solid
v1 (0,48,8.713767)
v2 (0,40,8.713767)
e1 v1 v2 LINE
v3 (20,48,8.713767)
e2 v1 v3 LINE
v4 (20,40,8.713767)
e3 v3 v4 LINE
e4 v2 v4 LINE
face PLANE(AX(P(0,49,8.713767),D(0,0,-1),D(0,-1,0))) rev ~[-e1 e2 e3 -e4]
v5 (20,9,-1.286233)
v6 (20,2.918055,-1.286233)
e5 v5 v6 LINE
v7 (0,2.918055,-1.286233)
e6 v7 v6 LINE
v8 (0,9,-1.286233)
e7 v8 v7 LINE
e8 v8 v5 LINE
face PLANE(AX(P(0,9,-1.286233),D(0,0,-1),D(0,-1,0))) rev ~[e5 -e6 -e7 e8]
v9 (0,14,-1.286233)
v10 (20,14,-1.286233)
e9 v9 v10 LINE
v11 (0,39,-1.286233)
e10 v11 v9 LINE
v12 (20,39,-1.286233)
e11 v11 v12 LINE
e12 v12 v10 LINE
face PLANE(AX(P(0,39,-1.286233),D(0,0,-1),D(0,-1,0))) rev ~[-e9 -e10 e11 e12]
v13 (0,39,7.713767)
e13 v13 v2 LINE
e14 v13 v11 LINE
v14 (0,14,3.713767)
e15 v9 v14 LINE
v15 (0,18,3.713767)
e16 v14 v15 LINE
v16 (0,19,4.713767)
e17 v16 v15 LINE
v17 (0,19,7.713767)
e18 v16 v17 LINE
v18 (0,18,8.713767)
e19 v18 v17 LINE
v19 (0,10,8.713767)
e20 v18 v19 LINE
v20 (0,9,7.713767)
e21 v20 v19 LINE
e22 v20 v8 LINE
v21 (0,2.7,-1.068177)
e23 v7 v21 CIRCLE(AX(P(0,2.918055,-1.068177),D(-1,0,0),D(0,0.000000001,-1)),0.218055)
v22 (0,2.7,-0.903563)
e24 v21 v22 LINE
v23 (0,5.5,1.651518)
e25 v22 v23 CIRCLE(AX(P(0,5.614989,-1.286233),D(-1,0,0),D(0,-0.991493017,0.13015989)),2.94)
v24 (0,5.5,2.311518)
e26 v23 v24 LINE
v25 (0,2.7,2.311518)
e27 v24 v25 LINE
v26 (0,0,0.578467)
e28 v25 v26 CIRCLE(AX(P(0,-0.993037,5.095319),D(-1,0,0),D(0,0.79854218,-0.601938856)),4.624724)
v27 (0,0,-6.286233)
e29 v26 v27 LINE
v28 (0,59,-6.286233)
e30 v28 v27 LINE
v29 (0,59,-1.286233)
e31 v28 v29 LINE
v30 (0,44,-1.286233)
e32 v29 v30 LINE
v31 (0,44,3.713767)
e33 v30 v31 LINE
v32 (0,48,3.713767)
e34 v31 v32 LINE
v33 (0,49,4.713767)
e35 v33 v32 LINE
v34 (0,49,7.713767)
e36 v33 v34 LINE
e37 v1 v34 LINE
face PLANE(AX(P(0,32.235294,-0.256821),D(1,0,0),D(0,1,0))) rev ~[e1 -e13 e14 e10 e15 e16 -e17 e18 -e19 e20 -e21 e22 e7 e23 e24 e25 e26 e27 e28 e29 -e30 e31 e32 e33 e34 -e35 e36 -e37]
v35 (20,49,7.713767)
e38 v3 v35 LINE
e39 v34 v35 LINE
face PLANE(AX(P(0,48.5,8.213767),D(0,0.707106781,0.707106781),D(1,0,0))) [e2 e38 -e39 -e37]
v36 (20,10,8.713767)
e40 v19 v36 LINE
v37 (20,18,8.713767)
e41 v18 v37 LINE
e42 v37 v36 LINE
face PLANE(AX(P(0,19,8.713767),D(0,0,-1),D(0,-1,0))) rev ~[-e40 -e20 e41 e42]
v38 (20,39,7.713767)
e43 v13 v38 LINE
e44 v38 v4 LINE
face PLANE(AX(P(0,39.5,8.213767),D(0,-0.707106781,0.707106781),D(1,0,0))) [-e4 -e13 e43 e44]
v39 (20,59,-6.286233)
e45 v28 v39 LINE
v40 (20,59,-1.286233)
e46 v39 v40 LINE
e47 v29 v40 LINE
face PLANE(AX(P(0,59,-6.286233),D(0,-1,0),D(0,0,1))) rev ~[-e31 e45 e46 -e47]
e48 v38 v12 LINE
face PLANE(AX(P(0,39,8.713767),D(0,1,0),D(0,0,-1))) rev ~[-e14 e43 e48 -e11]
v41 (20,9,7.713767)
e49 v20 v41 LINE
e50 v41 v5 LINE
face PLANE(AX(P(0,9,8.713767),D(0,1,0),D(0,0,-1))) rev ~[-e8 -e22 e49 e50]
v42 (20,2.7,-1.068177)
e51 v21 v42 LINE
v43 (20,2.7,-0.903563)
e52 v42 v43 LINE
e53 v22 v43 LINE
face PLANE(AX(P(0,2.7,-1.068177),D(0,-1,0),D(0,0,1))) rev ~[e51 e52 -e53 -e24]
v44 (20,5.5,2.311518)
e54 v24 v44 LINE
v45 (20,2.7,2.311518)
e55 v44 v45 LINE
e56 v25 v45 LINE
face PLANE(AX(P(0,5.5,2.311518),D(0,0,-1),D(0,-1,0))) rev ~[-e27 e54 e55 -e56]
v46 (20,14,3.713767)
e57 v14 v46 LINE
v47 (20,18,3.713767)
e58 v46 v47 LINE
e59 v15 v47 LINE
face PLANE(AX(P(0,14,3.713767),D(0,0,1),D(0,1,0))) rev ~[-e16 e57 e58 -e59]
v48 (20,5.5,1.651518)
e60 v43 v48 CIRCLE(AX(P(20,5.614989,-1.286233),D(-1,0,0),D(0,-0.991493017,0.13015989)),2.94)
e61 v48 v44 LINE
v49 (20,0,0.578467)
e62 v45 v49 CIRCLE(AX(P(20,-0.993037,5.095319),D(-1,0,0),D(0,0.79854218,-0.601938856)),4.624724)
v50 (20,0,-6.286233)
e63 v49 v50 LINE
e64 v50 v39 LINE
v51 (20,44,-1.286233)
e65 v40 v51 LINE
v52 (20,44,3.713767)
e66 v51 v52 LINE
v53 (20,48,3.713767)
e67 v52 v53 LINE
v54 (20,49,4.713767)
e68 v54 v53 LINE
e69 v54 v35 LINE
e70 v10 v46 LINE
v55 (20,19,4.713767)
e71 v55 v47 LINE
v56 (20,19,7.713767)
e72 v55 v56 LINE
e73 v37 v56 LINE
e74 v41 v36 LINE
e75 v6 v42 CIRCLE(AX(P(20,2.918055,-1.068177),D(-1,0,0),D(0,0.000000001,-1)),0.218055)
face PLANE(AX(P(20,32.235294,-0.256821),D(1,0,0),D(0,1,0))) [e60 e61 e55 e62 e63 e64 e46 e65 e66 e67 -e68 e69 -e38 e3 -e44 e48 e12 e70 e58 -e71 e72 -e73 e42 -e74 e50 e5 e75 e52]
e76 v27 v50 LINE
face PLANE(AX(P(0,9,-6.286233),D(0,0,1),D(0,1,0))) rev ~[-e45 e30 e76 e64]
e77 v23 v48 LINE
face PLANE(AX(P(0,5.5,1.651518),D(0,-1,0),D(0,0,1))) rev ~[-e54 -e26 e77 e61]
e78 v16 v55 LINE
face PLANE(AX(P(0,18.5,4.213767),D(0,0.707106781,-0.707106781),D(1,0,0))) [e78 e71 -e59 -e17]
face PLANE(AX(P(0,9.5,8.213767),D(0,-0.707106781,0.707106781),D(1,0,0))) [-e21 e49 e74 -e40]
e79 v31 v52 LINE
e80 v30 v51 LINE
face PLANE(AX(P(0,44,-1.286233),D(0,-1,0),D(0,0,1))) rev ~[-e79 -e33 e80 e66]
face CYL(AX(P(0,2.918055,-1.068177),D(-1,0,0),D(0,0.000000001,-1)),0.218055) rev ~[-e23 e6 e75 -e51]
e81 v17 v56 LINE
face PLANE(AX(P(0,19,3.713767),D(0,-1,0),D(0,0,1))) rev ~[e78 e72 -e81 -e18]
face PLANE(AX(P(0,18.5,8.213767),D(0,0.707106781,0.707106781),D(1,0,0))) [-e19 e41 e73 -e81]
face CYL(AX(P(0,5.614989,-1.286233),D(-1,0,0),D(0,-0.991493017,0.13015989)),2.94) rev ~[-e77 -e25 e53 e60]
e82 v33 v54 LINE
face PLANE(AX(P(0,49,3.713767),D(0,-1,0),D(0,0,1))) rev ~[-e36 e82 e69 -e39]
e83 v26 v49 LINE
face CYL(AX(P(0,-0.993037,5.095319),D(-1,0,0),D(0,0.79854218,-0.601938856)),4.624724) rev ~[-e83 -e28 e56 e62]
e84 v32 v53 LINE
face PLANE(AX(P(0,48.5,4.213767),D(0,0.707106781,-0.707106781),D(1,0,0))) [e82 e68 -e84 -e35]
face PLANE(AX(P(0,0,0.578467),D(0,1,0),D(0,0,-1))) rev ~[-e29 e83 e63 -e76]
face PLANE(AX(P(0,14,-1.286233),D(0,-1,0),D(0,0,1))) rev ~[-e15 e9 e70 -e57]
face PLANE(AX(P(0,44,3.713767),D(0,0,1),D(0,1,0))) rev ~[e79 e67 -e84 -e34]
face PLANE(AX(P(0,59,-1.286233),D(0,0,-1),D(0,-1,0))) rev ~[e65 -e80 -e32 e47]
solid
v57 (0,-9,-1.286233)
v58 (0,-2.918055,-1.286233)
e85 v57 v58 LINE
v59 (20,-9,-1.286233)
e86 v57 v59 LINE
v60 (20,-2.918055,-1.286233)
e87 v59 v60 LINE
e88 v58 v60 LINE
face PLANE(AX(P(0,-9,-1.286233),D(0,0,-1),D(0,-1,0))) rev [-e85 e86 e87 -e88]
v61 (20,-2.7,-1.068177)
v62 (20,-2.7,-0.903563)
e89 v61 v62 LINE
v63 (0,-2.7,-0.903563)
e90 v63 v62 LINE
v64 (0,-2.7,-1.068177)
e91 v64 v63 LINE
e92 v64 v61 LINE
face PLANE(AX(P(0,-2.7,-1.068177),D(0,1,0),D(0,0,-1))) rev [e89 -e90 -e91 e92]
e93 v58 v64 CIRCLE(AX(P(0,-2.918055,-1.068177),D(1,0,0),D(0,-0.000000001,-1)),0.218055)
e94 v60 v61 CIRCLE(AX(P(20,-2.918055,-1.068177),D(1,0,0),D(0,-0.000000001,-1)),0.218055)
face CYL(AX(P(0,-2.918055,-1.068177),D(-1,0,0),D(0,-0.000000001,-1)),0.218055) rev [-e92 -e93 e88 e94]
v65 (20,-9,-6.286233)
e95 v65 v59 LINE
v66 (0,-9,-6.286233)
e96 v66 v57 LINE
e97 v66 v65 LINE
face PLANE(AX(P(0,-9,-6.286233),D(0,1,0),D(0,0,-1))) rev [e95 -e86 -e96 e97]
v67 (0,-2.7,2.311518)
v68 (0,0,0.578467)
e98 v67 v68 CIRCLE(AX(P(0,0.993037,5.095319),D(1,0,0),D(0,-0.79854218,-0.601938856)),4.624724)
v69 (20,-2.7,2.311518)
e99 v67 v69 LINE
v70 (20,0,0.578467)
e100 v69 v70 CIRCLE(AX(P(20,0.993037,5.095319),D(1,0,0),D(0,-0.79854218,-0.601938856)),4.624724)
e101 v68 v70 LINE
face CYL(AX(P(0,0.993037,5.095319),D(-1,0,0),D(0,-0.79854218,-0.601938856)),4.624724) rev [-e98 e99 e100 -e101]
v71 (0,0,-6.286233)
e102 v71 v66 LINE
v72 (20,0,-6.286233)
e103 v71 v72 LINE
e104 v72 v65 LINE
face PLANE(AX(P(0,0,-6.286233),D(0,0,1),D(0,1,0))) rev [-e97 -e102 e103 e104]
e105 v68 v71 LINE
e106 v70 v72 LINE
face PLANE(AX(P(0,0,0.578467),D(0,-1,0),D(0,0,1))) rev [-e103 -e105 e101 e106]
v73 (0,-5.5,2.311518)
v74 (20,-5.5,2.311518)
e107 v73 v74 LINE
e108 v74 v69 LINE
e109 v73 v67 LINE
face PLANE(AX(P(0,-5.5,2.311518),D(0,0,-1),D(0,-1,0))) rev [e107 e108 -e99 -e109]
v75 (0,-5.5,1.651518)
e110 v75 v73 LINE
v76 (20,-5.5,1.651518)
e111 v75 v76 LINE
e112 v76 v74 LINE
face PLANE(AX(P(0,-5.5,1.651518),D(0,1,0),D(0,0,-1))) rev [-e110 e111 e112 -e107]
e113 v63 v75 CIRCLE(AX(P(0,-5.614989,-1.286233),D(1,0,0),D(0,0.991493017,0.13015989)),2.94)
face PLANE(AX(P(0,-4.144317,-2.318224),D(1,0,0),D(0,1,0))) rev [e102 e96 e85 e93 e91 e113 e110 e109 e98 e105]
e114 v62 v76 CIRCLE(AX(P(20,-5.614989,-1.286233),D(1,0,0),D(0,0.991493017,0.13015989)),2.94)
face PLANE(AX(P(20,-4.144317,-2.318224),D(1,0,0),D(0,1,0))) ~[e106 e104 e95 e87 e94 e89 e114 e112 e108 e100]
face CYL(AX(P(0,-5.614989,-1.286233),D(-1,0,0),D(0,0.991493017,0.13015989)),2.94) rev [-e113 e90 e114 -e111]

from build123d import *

# Parameters (mm, degrees)
F1_DEPTH = 20
F3_DEPTH = 20
F4_SIZE  = 1


# Not quite as in the source:
# - a pattern or mirror of a feature is missing from the dataset's text; its kind, count and spacing are read off the source's solid


with BuildPart() as f1:
    # F0 (on Right) → F1 (new body)
    with BuildSketch(Plane.YZ):
        with BuildLine():
            Line((5.5, 2.3115177173), (2.7, 2.3115177173))
            ThreePointArc((2.7, 2.3115177173), (1.5050999961, 1.2033549585), (0, 0.5784671916))
            Line((0, 0.5784671916), (0, -6.2862326842))
            Line((0, -6.2862326842), (9, -6.2862326842))
            Line((9, -6.2862326842), (9, -1.2862326842))
            Line((9, -1.2862326842), (2.9180552616, -1.2862326842))
            ThreePointArc((2.9180552616, -1.2862326842), (2.7638669074, -1.2223657768), (2.7, -1.0681774227))
            Line((2.7, -1.0681774227), (2.7, -0.9035626068))
            ThreePointArc((2.7, -0.9035626068), (3.6332473174, 0.8854712641), (5.5, 1.6515177173))
            Line((5.5, 1.6515177173), (5.5, 2.3115177173))
        make_face()
    extrude(amount=F1_DEPTH)


with BuildPart() as f1_copies_1:
    # F1_copies: instance of F1
    add(f1.part.mirror(Plane(origin=(0, 0, 0), x_dir=(0, 0, -1), z_dir=(0, -1, 0))))


with BuildPart() as f1_1:
    add(f1.part)

    # F2 (on Right) → F3 (join)
    with BuildSketch(Plane.YZ):
        Polygon((9, 8.7137673158), (9, -6.2862326842), (59, -6.2862326842), (59, -1.2862326842), (44, -1.2862326842), (44, 3.7137673158), (49, 3.7137673158), (49, 8.7137673158), (39, 8.7137673158), (39, -1.2862326842), (14, -1.2862326842), (14, 3.7137673158), (19, 3.7137673158), (19, 8.7137673158), align=None)
    extrude(amount=F3_DEPTH)

    # F4
    f4_edges = [f1_1.edges().sort_by_distance(p)[0] for p in [
        (10, 19, 3.713767),
        (10, 19, 8.713767),
        (10, 49, 8.713767),
        (10, 49, 3.713767),
        (10, 39, 8.713767),
        (10, 9, 8.713767),
    ]]
    chamfer(f4_edges, length=F4_SIZE)


solid = Compound([f1_copies_1.part, f1_1.part])
